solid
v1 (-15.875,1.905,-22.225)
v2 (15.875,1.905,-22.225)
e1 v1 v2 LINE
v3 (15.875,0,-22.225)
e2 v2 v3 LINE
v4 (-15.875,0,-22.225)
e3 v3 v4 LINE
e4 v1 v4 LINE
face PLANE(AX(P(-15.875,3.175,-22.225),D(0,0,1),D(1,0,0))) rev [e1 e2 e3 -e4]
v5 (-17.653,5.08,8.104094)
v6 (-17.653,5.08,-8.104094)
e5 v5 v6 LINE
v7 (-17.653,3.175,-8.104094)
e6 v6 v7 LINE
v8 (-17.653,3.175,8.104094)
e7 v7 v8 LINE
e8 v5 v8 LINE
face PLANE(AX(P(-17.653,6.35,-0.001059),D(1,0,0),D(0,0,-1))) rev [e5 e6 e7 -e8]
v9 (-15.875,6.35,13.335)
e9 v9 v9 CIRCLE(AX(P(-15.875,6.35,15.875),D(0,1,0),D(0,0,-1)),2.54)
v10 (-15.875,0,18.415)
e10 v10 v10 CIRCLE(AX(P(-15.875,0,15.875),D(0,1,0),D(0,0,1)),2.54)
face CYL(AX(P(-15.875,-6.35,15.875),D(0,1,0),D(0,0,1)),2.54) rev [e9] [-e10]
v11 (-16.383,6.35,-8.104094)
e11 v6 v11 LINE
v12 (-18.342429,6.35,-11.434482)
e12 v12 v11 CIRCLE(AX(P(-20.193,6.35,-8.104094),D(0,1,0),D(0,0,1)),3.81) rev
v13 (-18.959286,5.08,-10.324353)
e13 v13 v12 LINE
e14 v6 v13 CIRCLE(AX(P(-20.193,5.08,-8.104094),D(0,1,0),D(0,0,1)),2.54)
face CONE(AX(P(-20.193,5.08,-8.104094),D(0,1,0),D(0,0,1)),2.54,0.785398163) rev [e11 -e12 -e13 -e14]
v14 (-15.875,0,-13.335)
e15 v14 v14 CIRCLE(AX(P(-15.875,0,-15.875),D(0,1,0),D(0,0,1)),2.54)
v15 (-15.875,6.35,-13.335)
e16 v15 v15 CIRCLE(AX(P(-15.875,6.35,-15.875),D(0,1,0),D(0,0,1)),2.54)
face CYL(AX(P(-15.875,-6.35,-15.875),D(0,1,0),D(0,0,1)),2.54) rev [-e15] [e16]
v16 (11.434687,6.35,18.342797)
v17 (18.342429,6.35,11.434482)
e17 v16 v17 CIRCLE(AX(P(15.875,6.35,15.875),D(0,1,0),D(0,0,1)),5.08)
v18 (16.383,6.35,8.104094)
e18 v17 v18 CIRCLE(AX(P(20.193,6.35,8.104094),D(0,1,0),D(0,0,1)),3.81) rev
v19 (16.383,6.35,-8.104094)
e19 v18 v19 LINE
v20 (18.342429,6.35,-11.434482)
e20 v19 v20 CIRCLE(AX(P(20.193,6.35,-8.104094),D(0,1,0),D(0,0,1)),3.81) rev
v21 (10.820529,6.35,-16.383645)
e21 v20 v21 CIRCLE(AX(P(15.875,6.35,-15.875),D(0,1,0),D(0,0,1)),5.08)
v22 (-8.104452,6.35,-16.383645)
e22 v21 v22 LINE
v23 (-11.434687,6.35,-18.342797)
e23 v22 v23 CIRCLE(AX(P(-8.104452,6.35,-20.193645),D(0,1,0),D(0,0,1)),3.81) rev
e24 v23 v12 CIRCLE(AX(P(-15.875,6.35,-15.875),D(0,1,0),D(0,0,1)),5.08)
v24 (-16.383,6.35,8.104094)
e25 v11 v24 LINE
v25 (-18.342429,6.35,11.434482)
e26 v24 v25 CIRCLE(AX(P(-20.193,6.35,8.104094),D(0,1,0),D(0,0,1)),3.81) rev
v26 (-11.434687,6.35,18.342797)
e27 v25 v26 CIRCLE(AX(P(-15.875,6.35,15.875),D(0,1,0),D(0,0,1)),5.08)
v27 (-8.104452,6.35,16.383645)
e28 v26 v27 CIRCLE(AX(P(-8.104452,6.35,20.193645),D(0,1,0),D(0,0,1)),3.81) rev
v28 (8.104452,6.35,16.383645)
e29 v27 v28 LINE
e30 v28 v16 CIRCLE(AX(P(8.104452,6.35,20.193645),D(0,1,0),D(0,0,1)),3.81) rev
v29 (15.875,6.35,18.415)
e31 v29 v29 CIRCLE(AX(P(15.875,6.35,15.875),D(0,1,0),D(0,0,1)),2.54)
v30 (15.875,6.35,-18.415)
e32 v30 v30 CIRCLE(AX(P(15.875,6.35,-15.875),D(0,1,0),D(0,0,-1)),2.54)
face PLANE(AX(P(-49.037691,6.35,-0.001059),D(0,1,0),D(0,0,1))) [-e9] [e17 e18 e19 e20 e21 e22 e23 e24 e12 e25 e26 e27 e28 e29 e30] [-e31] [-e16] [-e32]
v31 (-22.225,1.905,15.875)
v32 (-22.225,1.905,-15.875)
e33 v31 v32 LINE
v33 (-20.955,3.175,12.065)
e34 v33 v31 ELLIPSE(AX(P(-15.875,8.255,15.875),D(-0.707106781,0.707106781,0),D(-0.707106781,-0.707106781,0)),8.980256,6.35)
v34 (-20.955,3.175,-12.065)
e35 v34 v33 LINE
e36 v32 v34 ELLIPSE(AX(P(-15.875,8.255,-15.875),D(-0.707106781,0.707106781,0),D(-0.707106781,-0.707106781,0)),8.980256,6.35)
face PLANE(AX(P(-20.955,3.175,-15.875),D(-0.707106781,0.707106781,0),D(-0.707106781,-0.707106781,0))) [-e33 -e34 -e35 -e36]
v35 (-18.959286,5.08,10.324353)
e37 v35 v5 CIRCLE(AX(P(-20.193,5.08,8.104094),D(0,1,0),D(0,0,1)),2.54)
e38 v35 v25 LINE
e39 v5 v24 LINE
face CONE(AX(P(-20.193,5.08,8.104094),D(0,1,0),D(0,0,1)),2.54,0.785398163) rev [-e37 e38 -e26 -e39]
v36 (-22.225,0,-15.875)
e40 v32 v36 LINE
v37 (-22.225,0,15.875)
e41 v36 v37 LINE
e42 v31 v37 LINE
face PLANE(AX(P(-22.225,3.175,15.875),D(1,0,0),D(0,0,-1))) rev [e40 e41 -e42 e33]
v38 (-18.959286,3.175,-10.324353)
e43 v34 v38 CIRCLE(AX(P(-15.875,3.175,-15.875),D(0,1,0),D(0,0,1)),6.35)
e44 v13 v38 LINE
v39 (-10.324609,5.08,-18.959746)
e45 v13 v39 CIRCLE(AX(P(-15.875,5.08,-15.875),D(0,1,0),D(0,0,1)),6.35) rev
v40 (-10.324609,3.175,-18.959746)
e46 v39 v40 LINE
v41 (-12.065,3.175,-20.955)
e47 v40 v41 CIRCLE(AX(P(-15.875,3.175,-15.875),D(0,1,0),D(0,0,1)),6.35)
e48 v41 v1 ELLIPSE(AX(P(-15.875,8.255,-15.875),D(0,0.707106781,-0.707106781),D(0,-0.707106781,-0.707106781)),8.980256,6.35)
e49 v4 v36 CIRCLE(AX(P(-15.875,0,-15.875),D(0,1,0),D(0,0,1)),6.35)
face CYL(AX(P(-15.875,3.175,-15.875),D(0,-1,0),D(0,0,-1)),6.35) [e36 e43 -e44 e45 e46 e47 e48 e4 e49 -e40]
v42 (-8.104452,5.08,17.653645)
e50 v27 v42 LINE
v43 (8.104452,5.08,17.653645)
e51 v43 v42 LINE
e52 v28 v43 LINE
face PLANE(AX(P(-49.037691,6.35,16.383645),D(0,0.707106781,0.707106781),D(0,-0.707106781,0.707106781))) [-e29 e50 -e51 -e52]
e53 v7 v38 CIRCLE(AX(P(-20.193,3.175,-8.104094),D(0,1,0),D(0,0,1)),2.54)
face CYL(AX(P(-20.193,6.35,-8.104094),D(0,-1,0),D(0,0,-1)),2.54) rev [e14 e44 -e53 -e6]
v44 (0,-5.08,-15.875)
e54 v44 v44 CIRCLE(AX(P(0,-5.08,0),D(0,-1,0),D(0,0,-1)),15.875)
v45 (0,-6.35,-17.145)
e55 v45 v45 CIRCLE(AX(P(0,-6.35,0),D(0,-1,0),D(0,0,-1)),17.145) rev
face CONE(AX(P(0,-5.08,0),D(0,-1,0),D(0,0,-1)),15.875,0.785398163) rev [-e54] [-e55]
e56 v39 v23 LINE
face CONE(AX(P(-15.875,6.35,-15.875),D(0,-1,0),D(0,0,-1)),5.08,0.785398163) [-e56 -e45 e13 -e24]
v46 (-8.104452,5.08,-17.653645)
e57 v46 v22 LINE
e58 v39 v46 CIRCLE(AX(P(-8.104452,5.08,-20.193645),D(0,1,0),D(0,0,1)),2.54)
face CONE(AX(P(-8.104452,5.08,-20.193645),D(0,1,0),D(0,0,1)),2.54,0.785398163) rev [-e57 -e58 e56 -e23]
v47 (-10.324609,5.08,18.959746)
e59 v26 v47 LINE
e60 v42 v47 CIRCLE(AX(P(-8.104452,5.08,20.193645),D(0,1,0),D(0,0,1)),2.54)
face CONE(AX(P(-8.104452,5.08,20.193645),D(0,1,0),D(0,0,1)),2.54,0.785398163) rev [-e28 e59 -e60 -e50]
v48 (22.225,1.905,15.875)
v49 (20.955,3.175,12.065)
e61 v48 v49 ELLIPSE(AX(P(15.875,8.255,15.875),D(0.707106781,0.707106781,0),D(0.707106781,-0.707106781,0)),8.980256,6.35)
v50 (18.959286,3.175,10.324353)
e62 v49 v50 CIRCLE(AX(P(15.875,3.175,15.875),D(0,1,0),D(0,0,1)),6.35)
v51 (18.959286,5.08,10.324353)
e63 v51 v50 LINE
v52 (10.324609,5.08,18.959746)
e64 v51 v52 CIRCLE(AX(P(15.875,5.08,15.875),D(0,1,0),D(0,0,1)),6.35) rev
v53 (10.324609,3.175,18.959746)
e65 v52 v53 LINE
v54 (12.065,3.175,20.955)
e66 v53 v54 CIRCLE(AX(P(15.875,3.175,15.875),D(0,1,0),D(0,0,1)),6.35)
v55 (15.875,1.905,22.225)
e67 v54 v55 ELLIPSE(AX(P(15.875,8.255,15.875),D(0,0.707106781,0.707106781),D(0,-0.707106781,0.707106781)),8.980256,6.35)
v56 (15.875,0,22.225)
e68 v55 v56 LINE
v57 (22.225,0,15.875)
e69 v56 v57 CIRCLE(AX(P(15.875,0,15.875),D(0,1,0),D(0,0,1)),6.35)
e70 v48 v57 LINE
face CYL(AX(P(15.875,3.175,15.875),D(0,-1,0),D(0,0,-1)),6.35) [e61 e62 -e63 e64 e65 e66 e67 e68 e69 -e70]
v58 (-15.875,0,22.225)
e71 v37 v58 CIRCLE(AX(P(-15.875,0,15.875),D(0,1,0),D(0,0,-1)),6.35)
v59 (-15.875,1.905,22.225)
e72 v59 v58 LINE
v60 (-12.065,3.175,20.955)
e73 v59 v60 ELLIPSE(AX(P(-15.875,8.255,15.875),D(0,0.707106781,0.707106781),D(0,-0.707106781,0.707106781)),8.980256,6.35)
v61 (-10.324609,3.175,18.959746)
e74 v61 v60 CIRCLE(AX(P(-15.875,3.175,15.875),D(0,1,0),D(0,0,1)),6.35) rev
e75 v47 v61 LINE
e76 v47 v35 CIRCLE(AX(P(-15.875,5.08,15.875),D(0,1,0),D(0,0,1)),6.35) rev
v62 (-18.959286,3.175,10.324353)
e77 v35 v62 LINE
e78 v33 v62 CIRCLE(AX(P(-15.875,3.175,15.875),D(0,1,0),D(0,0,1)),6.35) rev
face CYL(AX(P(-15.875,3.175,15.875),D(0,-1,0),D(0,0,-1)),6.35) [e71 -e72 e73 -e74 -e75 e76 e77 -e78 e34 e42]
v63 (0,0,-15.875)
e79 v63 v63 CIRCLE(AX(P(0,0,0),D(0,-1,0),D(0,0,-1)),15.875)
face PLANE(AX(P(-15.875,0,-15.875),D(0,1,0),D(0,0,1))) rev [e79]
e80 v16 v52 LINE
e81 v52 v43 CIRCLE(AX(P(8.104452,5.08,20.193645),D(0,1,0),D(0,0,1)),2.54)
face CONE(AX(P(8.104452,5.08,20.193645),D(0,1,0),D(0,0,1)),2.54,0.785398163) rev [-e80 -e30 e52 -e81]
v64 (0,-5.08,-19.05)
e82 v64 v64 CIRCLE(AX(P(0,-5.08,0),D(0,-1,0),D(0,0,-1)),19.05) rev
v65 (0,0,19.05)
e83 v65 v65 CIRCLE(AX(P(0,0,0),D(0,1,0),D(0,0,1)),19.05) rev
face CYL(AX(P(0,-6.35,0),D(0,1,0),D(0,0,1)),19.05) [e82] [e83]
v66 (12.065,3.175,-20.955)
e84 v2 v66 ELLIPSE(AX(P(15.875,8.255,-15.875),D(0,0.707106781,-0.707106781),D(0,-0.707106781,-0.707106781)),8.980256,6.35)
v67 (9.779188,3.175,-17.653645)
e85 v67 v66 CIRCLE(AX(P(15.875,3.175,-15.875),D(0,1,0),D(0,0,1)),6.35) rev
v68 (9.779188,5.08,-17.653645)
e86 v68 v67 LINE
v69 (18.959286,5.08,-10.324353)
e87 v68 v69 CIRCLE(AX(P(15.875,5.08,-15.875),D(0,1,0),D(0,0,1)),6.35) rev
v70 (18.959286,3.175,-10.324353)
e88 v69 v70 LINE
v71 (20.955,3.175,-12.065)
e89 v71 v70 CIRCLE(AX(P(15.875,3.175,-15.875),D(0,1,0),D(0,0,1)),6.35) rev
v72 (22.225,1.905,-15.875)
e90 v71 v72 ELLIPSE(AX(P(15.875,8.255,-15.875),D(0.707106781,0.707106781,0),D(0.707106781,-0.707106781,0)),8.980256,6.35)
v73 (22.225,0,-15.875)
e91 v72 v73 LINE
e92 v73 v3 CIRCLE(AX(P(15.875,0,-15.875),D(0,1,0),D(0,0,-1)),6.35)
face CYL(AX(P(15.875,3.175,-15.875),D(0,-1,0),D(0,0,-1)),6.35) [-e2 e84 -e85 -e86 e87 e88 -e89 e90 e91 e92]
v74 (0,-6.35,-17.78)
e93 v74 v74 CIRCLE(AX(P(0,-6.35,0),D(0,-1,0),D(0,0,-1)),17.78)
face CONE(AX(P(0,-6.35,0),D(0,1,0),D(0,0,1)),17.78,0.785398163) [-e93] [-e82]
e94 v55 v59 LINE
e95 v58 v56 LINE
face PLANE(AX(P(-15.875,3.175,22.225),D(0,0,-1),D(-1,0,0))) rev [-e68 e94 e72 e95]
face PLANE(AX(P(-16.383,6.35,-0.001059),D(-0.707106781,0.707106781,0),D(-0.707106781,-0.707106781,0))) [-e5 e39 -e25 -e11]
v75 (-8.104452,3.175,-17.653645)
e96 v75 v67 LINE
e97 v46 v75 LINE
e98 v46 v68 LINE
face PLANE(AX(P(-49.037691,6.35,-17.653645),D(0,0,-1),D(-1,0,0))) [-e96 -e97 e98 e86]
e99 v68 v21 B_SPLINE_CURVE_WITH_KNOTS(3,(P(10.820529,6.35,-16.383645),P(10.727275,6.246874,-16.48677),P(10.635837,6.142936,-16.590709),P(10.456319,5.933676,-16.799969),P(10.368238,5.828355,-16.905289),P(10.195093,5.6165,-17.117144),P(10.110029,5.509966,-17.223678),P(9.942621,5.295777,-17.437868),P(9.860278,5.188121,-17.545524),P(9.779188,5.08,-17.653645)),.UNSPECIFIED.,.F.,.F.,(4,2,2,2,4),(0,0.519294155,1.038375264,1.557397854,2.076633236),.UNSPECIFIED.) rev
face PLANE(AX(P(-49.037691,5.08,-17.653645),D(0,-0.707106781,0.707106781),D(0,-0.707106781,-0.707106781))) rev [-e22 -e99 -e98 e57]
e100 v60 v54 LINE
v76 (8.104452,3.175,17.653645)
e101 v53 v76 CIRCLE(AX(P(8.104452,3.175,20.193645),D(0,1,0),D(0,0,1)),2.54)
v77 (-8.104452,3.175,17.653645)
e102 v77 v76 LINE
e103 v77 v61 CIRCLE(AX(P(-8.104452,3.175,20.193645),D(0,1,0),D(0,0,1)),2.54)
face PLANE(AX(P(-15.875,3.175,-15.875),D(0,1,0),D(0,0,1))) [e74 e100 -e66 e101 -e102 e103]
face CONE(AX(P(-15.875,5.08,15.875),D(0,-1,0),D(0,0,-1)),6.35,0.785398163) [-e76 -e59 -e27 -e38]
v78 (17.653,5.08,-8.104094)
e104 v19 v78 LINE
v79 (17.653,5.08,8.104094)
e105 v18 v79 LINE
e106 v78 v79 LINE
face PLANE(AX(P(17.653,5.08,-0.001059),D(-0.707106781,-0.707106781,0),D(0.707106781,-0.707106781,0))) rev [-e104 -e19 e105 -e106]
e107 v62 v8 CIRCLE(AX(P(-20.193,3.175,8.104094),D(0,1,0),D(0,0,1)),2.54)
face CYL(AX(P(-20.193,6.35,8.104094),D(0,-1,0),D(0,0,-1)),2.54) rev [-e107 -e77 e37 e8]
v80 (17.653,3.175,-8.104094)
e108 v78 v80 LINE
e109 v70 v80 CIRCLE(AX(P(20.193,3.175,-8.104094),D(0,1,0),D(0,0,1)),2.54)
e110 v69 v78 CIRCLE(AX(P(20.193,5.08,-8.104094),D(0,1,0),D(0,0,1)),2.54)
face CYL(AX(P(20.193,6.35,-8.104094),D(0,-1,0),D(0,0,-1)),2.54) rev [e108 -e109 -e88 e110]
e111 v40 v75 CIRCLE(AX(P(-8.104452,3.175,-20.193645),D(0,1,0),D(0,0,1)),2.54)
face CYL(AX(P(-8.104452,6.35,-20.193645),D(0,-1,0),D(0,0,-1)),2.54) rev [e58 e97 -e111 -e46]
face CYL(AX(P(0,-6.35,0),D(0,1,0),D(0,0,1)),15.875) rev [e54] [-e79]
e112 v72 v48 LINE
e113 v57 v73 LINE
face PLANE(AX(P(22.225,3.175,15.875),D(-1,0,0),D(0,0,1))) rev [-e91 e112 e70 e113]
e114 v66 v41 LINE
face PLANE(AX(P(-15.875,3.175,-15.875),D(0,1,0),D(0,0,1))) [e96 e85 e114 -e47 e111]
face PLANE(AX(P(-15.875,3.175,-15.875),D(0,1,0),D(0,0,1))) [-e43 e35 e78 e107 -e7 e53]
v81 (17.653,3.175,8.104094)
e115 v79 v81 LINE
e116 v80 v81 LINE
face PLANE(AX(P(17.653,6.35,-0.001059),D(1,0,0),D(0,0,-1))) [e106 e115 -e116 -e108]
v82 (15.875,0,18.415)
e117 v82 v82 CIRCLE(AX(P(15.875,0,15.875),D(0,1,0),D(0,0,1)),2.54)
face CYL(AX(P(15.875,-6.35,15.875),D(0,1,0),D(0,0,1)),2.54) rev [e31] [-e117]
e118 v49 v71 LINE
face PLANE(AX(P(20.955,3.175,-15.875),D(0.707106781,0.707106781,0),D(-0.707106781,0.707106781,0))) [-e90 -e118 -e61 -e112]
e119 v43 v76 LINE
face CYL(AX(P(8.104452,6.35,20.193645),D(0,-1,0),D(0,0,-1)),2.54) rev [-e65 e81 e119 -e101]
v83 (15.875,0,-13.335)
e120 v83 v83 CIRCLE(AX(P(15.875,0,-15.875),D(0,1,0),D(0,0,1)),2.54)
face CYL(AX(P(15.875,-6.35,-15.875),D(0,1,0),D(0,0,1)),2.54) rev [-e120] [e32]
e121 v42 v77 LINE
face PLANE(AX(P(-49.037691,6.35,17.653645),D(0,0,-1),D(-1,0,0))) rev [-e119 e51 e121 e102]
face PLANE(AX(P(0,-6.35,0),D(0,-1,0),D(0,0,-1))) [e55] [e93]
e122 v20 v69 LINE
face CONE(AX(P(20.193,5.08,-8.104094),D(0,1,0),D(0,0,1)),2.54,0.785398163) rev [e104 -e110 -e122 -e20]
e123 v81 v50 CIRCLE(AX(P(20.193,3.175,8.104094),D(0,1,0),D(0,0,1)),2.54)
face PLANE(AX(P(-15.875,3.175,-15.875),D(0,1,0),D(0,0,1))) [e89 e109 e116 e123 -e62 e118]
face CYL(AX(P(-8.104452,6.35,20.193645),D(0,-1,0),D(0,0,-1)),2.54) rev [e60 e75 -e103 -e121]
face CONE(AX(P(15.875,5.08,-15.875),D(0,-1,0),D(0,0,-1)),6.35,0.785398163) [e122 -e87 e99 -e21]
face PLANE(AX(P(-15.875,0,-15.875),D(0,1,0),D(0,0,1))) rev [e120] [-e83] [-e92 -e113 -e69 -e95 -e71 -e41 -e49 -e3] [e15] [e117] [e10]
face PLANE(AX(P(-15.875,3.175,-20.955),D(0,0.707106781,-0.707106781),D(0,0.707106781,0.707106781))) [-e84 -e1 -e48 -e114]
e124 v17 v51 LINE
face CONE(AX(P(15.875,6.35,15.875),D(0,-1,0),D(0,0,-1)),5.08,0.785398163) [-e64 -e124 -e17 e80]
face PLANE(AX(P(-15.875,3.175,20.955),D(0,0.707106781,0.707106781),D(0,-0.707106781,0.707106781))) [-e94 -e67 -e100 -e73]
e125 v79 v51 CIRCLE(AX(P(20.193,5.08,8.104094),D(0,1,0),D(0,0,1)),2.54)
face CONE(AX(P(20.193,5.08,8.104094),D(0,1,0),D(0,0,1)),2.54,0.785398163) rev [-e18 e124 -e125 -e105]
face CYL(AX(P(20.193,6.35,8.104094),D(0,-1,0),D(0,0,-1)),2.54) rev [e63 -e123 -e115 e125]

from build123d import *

# Parameters (mm, degrees)
BOSS_EXTRUDE1_DEPTH = 3.175
BOSS_EXTRUDE2_DEPTH = 3.175
SKETCH3_R           = 19.05
SKETCH3_R_2         = 15.875
BOSS_EXTRUDE3_DEPTH = 6.35
SKETCH4_R           = 2.54
CUT_EXTRUDE1_DEPTH  = 34.89972345
CHAMFER1_SIZE       = 1.27


with BuildPart() as part:
    # Sketch1 → Boss-Extrude1 (new body)
    with BuildSketch(Plane(origin=(0, 0, 0), x_dir=(1, 0, 0), z_dir=(0, 1, 0))):
        with BuildLine():
            Line((-15.875, -22.225), (15.875, -22.225))
            ThreePointArc((15.875, -22.225), (20.365128061, -20.365128061), (22.225, -15.875))
            Line((22.225, -15.875), (22.225, 15.875))
            ThreePointArc((22.225, 15.875), (20.365128061, 20.365128061), (15.875, 22.225))
            Line((15.875, 22.225), (-15.875, 22.225))
            ThreePointArc((-15.875, 22.225), (-20.365128061, 20.365128061), (-22.225, 15.875))
            Line((-22.225, 15.875), (-22.225, -15.875))
            ThreePointArc((-22.225, -15.875), (-20.365128061, -20.365128061), (-15.875, -22.225))
        make_face()
    extrude(amount=BOSS_EXTRUDE1_DEPTH)

    # Sketch2 → Boss-Extrude2 (add)
    with BuildSketch(Plane(origin=(0, 3.175, 0), x_dir=(1, 0, 0), z_dir=(0, 1, 0))):
        with BuildLine():
            Line((9.779188038, 17.653644576), (-8.104452463, 17.653644576))
            ThreePointArc((-8.104452463, 17.653644576), (-9.392376749, 18.004386475), (-10.324608902, 18.959746126))
            ThreePointArc((-10.324608902, 18.959746126), (-12.655189283, 21.348145252), (-15.875, 22.225))
            ThreePointArc((-15.875, 22.225), (-20.365128061, 20.365128061), (-22.225, 15.875))
            ThreePointArc((-22.225, 15.875), (-21.348011707, 12.654962289), (-18.959285714, 10.324353044))
            ThreePointArc((-18.959285714, 10.324353044), (-18.003795317, 9.392109345), (-17.653, 8.104094261))
            Line((-17.653, 8.104094261), (-17.653, -8.104094261))
            ThreePointArc((-17.653, -8.104094261), (-18.003795317, -9.392109345), (-18.959285714, -10.324353044))
            ThreePointArc((-18.959285714, -10.324353044), (-21.348011707, -12.654962289), (-22.225, -15.875))
            ThreePointArc((-22.225, -15.875), (-20.365128061, -20.365128061), (-15.875, -22.225))
            ThreePointArc((-15.875, -22.225), (-12.655189283, -21.348145252), (-10.324608902, -18.959746126))
            ThreePointArc((-10.324608902, -18.959746126), (-9.392376749, -18.004386475), (-8.104452463, -17.653644576))
            Line((-8.104452463, -17.653644576), (8.104452463, -17.653644576))
            ThreePointArc((8.104452463, -17.653644576), (9.392376749, -18.004386475), (10.324608902, -18.959746126))
            ThreePointArc((10.324608902, -18.959746126), (12.655189283, -21.348145252), (15.875, -22.225))
            ThreePointArc((15.875, -22.225), (20.365128061, -20.365128061), (22.225, -15.875))
            ThreePointArc((22.225, -15.875), (21.348011707, -12.654962289), (18.959285714, -10.324353044))
            ThreePointArc((18.959285714, -10.324353044), (18.003795317, -9.392109345), (17.653, -8.104094261))
            Line((17.653, -8.104094261), (17.653, 8.104094261))
            ThreePointArc((17.653, 8.104094261), (18.003795317, 9.392109345), (18.959285714, 10.324353044))
            ThreePointArc((18.959285714, 10.324353044), (21.348011707, 12.654962289), (22.225, 15.875))
            ThreePointArc((22.225, 15.875), (20.365128061, 20.365128061), (15.875, 22.225))
            ThreePointArc((15.875, 22.225), (12.065268583, 20.955201426), (9.779188038, 17.653644576))
        make_face()
    extrude(amount=BOSS_EXTRUDE2_DEPTH)

    # Sketch3 → Boss-Extrude3 (add)
    with BuildSketch(Plane.XZ):
        with Locations(Location((0, 0, 0), (0, 0, 90))):
            Circle(SKETCH3_R)
        with Locations(Location((0, 0, 0), (0, 0, 270))):
            Circle(SKETCH3_R_2, mode=Mode.SUBTRACT)
    extrude(amount=BOSS_EXTRUDE3_DEPTH)

    # Sketch4 → Cut-Extrude1 (cut, through all)
    with BuildSketch(Plane(origin=(0, 6.35, 0), x_dir=(1, 0, 0), z_dir=(0, 1, 0))):
        with Locations(Location((-15.875, 15.875, 0), (0, 0, 270))):
            Circle(SKETCH4_R)
        with Locations(Location((15.875, 15.875, 0), (0, 0, 270))):
            Circle(SKETCH4_R)
        with Locations(Location((-15.875, -15.875, 0), (0, 0, 270))):
            Circle(SKETCH4_R)
        with Locations(Location((15.875, -15.875, 0), (0, 0, 270))):
            Circle(SKETCH4_R)
    extrude(amount=-CUT_EXTRUDE1_DEPTH, mode=Mode.SUBTRACT)

    # Chamfer1
    chamfer1_edges = [part.edges().sort_by_distance(p)[0] for p in [
        (-20.365314283, 6.35, -20.36494183),
        (-20.365314283, 6.35, 20.36494183),
        (-9.392376749, 6.35, -18.004386475),
        (19.836937806, 6.35, -20.837413609),
        (0.837367788, 6.35, -17.653644576),
        (18.003795317, 6.35, -9.392109345),
        (17.653, 6.35, 0),
        (18.003795317, 6.35, 9.392109345),
        (-18.003795317, 6.35, -9.392109345),
        (20.365314283, 6.35, 20.36494183),
        (-17.653, 6.35, 0),
        (9.392376749, 6.35, 18.004386475),
        (-18.003795317, 6.35, 9.392109345),
        (0, 6.35, 17.653644576),
        (-9.392376749, 6.35, 18.004386475),
    ]]
    chamfer(chamfer1_edges, length=CHAMFER1_SIZE)
    chamfer1_2_edges = [part.edges().sort_by_distance(p)[0] for p in [
        (0, -6.35, -19.05),
    ]]
    chamfer(chamfer1_2_edges, length=CHAMFER1_SIZE)
    chamfer1_3_edges = [part.edges().sort_by_distance(p)[0] for p in [
        (0, -6.35, 15.875),
    ]]
    chamfer(chamfer1_3_edges, length=CHAMFER1_SIZE)
    # the kernel refuses this chamfer: 1.27 mm, written as the material it takes off along each edge
    with BuildSketch(Plane(origin=(-22.225, 3.175, -19.141037395), x_dir=(-0.02749587661058728, -0.9996219169112966, 0), z_dir=(0, 0, 1))) as chamfer1_4_piece_1_section:
        with BuildLine():
            Line((1.306414958, 0), (-0.071814887, 1.304439598))
            Line((-0.071814887, 1.304439598), (-0.097205283, 1.303741203))
            ThreePointArc((-0.097205283, 1.303741203), (-0.043344118, 0.652015244), (-0.025390397, -0.000698395))
            Line((-0.025390397, -0.000698395), (0.000698395, -0.025390397))
            ThreePointArc((0.000698395, -0.025390397), (0.653412034, -0.007436675), (1.307113353, -0.025390397))
            Line((1.307113353, -0.025390397), (1.306414958, 0))
        make_face()
    chamfer1_4_piece_1 = extrude(amount=38.282074789, mode=Mode.PRIVATE)
    chamfer1_4_piece_1 = chamfer1_4_piece_1 - Plane(origin=(-15.875, 2.735416382, -15.875), x_dir=(0, 0, -1), z_dir=(0, -1, 0)) * Cylinder(6.35, 82, mode=Mode.PRIVATE)
    chamfer1_4_piece_1 = chamfer1_4_piece_1 - Plane(origin=(-15.875, 2.735416382, 15.875), x_dir=(-1, 0, 0), z_dir=(0, -1, 0)) * Cylinder(6.35, 82, mode=Mode.PRIVATE)
    add(chamfer1_4_piece_1, mode=Mode.SUBTRACT)
    # the kernel refuses this chamfer: 1.27 mm, written as the material it takes off along each edge
    with BuildSketch(Plane(origin=(19.141037395, 3.175, -22.225), x_dir=(0, -0.9996219169112966, -0.02749587661058728), z_dir=(-1, 0, 0))) as chamfer1_5_piece_1_section:
        with BuildLine():
            Line((1.306414958, 0), (-0.071814887, 1.304439598))
            Line((-0.071814887, 1.304439598), (-0.097205283, 1.303741203))
            ThreePointArc((-0.097205283, 1.303741203), (-0.043344118, 0.652015244), (-0.025390397, -0.000698395))
            Line((-0.025390397, -0.000698395), (0.000698395, -0.025390397))
            ThreePointArc((0.000698395, -0.025390397), (0.653412034, -0.007436675), (1.307113353, -0.025390397))
            Line((1.307113353, -0.025390397), (1.306414958, 0))
        make_face()
    chamfer1_5_piece_1 = extrude(amount=38.282074789, mode=Mode.PRIVATE)
    chamfer1_5_piece_1 = chamfer1_5_piece_1 - Plane(origin=(-15.875, 2.735416382, -15.875), x_dir=(0, 0, -1), z_dir=(0, -1, 0)) * Cylinder(6.35, 82, mode=Mode.PRIVATE)
    chamfer1_5_piece_1 = chamfer1_5_piece_1 - Plane(origin=(15.875, 2.735416382, -15.875), x_dir=(1, 0, 0), z_dir=(0, -1, 0)) * Cylinder(6.35, 82, mode=Mode.PRIVATE)
    add(chamfer1_5_piece_1, mode=Mode.SUBTRACT)
    # the kernel refuses this chamfer: 1.27 mm, written as the material it takes off along each edge
    with BuildSketch(Plane(origin=(-19.141037395, 3.175, 22.225), x_dir=(0, -0.9996219169112966, 0.02749587661058728), z_dir=(1, 0, 0))) as chamfer1_6_piece_1_section:
        with BuildLine():
            Line((1.306414958, 0), (-0.071814887, 1.304439598))
            Line((-0.071814887, 1.304439598), (-0.097205283, 1.303741203))
            ThreePointArc((-0.097205283, 1.303741203), (-0.043344118, 0.652015244), (-0.025390397, -0.000698395))
            Line((-0.025390397, -0.000698395), (0.000698395, -0.025390397))
            ThreePointArc((0.000698395, -0.025390397), (0.653412034, -0.007436675), (1.307113353, -0.025390397))
            Line((1.307113353, -0.025390397), (1.306414958, 0))
        make_face()
    chamfer1_6_piece_1 = extrude(amount=38.282074789, mode=Mode.PRIVATE)
    chamfer1_6_piece_1 = chamfer1_6_piece_1 - Plane(origin=(-15.875, 2.735416383, 15.875), x_dir=(-1, 0, 0), z_dir=(0, -1, 0)) * Cylinder(6.35, 82, mode=Mode.PRIVATE)
    chamfer1_6_piece_1 = chamfer1_6_piece_1 - Plane(origin=(15.875, 2.735416383, 15.875), x_dir=(0, 0, 1), z_dir=(0, -1, 0)) * Cylinder(6.35, 82, mode=Mode.PRIVATE)
    add(chamfer1_6_piece_1, mode=Mode.SUBTRACT)
    # the kernel refuses this chamfer: 1.27 mm, written as the material it takes off along each edge
    with BuildSketch(Plane(origin=(22.225, 3.175, 19.141037395), x_dir=(0.02749587661058728, -0.9996219169112966, 0), z_dir=(0, 0, -1))) as chamfer1_7_piece_1_section:
        with BuildLine():
            Line((1.306414958, 0), (-0.071814887, 1.304439598))
            Line((-0.071814887, 1.304439598), (-0.097205283, 1.303741203))
            ThreePointArc((-0.097205283, 1.303741203), (-0.043344118, 0.652015244), (-0.025390397, -0.000698395))
            Line((-0.025390397, -0.000698395), (0.000698395, -0.025390397))
            ThreePointArc((0.000698395, -0.025390397), (0.653412034, -0.007436675), (1.307113353, -0.025390397))
            Line((1.307113353, -0.025390397), (1.306414958, 0))
        make_face()
    chamfer1_7_piece_1 = extrude(amount=38.282074789, mode=Mode.PRIVATE)
    chamfer1_7_piece_1 = chamfer1_7_piece_1 - Plane(origin=(15.875, 2.735416383, -15.875), x_dir=(1, 0, 0), z_dir=(0, -1, 0)) * Cylinder(6.35, 82, mode=Mode.PRIVATE)
    chamfer1_7_piece_1 = chamfer1_7_piece_1 - Plane(origin=(15.875, 2.735416383, 15.875), x_dir=(0, 0, 1), z_dir=(0, -1, 0)) * Cylinder(6.35, 82, mode=Mode.PRIVATE)
    add(chamfer1_7_piece_1, mode=Mode.SUBTRACT)


solid = part.part
